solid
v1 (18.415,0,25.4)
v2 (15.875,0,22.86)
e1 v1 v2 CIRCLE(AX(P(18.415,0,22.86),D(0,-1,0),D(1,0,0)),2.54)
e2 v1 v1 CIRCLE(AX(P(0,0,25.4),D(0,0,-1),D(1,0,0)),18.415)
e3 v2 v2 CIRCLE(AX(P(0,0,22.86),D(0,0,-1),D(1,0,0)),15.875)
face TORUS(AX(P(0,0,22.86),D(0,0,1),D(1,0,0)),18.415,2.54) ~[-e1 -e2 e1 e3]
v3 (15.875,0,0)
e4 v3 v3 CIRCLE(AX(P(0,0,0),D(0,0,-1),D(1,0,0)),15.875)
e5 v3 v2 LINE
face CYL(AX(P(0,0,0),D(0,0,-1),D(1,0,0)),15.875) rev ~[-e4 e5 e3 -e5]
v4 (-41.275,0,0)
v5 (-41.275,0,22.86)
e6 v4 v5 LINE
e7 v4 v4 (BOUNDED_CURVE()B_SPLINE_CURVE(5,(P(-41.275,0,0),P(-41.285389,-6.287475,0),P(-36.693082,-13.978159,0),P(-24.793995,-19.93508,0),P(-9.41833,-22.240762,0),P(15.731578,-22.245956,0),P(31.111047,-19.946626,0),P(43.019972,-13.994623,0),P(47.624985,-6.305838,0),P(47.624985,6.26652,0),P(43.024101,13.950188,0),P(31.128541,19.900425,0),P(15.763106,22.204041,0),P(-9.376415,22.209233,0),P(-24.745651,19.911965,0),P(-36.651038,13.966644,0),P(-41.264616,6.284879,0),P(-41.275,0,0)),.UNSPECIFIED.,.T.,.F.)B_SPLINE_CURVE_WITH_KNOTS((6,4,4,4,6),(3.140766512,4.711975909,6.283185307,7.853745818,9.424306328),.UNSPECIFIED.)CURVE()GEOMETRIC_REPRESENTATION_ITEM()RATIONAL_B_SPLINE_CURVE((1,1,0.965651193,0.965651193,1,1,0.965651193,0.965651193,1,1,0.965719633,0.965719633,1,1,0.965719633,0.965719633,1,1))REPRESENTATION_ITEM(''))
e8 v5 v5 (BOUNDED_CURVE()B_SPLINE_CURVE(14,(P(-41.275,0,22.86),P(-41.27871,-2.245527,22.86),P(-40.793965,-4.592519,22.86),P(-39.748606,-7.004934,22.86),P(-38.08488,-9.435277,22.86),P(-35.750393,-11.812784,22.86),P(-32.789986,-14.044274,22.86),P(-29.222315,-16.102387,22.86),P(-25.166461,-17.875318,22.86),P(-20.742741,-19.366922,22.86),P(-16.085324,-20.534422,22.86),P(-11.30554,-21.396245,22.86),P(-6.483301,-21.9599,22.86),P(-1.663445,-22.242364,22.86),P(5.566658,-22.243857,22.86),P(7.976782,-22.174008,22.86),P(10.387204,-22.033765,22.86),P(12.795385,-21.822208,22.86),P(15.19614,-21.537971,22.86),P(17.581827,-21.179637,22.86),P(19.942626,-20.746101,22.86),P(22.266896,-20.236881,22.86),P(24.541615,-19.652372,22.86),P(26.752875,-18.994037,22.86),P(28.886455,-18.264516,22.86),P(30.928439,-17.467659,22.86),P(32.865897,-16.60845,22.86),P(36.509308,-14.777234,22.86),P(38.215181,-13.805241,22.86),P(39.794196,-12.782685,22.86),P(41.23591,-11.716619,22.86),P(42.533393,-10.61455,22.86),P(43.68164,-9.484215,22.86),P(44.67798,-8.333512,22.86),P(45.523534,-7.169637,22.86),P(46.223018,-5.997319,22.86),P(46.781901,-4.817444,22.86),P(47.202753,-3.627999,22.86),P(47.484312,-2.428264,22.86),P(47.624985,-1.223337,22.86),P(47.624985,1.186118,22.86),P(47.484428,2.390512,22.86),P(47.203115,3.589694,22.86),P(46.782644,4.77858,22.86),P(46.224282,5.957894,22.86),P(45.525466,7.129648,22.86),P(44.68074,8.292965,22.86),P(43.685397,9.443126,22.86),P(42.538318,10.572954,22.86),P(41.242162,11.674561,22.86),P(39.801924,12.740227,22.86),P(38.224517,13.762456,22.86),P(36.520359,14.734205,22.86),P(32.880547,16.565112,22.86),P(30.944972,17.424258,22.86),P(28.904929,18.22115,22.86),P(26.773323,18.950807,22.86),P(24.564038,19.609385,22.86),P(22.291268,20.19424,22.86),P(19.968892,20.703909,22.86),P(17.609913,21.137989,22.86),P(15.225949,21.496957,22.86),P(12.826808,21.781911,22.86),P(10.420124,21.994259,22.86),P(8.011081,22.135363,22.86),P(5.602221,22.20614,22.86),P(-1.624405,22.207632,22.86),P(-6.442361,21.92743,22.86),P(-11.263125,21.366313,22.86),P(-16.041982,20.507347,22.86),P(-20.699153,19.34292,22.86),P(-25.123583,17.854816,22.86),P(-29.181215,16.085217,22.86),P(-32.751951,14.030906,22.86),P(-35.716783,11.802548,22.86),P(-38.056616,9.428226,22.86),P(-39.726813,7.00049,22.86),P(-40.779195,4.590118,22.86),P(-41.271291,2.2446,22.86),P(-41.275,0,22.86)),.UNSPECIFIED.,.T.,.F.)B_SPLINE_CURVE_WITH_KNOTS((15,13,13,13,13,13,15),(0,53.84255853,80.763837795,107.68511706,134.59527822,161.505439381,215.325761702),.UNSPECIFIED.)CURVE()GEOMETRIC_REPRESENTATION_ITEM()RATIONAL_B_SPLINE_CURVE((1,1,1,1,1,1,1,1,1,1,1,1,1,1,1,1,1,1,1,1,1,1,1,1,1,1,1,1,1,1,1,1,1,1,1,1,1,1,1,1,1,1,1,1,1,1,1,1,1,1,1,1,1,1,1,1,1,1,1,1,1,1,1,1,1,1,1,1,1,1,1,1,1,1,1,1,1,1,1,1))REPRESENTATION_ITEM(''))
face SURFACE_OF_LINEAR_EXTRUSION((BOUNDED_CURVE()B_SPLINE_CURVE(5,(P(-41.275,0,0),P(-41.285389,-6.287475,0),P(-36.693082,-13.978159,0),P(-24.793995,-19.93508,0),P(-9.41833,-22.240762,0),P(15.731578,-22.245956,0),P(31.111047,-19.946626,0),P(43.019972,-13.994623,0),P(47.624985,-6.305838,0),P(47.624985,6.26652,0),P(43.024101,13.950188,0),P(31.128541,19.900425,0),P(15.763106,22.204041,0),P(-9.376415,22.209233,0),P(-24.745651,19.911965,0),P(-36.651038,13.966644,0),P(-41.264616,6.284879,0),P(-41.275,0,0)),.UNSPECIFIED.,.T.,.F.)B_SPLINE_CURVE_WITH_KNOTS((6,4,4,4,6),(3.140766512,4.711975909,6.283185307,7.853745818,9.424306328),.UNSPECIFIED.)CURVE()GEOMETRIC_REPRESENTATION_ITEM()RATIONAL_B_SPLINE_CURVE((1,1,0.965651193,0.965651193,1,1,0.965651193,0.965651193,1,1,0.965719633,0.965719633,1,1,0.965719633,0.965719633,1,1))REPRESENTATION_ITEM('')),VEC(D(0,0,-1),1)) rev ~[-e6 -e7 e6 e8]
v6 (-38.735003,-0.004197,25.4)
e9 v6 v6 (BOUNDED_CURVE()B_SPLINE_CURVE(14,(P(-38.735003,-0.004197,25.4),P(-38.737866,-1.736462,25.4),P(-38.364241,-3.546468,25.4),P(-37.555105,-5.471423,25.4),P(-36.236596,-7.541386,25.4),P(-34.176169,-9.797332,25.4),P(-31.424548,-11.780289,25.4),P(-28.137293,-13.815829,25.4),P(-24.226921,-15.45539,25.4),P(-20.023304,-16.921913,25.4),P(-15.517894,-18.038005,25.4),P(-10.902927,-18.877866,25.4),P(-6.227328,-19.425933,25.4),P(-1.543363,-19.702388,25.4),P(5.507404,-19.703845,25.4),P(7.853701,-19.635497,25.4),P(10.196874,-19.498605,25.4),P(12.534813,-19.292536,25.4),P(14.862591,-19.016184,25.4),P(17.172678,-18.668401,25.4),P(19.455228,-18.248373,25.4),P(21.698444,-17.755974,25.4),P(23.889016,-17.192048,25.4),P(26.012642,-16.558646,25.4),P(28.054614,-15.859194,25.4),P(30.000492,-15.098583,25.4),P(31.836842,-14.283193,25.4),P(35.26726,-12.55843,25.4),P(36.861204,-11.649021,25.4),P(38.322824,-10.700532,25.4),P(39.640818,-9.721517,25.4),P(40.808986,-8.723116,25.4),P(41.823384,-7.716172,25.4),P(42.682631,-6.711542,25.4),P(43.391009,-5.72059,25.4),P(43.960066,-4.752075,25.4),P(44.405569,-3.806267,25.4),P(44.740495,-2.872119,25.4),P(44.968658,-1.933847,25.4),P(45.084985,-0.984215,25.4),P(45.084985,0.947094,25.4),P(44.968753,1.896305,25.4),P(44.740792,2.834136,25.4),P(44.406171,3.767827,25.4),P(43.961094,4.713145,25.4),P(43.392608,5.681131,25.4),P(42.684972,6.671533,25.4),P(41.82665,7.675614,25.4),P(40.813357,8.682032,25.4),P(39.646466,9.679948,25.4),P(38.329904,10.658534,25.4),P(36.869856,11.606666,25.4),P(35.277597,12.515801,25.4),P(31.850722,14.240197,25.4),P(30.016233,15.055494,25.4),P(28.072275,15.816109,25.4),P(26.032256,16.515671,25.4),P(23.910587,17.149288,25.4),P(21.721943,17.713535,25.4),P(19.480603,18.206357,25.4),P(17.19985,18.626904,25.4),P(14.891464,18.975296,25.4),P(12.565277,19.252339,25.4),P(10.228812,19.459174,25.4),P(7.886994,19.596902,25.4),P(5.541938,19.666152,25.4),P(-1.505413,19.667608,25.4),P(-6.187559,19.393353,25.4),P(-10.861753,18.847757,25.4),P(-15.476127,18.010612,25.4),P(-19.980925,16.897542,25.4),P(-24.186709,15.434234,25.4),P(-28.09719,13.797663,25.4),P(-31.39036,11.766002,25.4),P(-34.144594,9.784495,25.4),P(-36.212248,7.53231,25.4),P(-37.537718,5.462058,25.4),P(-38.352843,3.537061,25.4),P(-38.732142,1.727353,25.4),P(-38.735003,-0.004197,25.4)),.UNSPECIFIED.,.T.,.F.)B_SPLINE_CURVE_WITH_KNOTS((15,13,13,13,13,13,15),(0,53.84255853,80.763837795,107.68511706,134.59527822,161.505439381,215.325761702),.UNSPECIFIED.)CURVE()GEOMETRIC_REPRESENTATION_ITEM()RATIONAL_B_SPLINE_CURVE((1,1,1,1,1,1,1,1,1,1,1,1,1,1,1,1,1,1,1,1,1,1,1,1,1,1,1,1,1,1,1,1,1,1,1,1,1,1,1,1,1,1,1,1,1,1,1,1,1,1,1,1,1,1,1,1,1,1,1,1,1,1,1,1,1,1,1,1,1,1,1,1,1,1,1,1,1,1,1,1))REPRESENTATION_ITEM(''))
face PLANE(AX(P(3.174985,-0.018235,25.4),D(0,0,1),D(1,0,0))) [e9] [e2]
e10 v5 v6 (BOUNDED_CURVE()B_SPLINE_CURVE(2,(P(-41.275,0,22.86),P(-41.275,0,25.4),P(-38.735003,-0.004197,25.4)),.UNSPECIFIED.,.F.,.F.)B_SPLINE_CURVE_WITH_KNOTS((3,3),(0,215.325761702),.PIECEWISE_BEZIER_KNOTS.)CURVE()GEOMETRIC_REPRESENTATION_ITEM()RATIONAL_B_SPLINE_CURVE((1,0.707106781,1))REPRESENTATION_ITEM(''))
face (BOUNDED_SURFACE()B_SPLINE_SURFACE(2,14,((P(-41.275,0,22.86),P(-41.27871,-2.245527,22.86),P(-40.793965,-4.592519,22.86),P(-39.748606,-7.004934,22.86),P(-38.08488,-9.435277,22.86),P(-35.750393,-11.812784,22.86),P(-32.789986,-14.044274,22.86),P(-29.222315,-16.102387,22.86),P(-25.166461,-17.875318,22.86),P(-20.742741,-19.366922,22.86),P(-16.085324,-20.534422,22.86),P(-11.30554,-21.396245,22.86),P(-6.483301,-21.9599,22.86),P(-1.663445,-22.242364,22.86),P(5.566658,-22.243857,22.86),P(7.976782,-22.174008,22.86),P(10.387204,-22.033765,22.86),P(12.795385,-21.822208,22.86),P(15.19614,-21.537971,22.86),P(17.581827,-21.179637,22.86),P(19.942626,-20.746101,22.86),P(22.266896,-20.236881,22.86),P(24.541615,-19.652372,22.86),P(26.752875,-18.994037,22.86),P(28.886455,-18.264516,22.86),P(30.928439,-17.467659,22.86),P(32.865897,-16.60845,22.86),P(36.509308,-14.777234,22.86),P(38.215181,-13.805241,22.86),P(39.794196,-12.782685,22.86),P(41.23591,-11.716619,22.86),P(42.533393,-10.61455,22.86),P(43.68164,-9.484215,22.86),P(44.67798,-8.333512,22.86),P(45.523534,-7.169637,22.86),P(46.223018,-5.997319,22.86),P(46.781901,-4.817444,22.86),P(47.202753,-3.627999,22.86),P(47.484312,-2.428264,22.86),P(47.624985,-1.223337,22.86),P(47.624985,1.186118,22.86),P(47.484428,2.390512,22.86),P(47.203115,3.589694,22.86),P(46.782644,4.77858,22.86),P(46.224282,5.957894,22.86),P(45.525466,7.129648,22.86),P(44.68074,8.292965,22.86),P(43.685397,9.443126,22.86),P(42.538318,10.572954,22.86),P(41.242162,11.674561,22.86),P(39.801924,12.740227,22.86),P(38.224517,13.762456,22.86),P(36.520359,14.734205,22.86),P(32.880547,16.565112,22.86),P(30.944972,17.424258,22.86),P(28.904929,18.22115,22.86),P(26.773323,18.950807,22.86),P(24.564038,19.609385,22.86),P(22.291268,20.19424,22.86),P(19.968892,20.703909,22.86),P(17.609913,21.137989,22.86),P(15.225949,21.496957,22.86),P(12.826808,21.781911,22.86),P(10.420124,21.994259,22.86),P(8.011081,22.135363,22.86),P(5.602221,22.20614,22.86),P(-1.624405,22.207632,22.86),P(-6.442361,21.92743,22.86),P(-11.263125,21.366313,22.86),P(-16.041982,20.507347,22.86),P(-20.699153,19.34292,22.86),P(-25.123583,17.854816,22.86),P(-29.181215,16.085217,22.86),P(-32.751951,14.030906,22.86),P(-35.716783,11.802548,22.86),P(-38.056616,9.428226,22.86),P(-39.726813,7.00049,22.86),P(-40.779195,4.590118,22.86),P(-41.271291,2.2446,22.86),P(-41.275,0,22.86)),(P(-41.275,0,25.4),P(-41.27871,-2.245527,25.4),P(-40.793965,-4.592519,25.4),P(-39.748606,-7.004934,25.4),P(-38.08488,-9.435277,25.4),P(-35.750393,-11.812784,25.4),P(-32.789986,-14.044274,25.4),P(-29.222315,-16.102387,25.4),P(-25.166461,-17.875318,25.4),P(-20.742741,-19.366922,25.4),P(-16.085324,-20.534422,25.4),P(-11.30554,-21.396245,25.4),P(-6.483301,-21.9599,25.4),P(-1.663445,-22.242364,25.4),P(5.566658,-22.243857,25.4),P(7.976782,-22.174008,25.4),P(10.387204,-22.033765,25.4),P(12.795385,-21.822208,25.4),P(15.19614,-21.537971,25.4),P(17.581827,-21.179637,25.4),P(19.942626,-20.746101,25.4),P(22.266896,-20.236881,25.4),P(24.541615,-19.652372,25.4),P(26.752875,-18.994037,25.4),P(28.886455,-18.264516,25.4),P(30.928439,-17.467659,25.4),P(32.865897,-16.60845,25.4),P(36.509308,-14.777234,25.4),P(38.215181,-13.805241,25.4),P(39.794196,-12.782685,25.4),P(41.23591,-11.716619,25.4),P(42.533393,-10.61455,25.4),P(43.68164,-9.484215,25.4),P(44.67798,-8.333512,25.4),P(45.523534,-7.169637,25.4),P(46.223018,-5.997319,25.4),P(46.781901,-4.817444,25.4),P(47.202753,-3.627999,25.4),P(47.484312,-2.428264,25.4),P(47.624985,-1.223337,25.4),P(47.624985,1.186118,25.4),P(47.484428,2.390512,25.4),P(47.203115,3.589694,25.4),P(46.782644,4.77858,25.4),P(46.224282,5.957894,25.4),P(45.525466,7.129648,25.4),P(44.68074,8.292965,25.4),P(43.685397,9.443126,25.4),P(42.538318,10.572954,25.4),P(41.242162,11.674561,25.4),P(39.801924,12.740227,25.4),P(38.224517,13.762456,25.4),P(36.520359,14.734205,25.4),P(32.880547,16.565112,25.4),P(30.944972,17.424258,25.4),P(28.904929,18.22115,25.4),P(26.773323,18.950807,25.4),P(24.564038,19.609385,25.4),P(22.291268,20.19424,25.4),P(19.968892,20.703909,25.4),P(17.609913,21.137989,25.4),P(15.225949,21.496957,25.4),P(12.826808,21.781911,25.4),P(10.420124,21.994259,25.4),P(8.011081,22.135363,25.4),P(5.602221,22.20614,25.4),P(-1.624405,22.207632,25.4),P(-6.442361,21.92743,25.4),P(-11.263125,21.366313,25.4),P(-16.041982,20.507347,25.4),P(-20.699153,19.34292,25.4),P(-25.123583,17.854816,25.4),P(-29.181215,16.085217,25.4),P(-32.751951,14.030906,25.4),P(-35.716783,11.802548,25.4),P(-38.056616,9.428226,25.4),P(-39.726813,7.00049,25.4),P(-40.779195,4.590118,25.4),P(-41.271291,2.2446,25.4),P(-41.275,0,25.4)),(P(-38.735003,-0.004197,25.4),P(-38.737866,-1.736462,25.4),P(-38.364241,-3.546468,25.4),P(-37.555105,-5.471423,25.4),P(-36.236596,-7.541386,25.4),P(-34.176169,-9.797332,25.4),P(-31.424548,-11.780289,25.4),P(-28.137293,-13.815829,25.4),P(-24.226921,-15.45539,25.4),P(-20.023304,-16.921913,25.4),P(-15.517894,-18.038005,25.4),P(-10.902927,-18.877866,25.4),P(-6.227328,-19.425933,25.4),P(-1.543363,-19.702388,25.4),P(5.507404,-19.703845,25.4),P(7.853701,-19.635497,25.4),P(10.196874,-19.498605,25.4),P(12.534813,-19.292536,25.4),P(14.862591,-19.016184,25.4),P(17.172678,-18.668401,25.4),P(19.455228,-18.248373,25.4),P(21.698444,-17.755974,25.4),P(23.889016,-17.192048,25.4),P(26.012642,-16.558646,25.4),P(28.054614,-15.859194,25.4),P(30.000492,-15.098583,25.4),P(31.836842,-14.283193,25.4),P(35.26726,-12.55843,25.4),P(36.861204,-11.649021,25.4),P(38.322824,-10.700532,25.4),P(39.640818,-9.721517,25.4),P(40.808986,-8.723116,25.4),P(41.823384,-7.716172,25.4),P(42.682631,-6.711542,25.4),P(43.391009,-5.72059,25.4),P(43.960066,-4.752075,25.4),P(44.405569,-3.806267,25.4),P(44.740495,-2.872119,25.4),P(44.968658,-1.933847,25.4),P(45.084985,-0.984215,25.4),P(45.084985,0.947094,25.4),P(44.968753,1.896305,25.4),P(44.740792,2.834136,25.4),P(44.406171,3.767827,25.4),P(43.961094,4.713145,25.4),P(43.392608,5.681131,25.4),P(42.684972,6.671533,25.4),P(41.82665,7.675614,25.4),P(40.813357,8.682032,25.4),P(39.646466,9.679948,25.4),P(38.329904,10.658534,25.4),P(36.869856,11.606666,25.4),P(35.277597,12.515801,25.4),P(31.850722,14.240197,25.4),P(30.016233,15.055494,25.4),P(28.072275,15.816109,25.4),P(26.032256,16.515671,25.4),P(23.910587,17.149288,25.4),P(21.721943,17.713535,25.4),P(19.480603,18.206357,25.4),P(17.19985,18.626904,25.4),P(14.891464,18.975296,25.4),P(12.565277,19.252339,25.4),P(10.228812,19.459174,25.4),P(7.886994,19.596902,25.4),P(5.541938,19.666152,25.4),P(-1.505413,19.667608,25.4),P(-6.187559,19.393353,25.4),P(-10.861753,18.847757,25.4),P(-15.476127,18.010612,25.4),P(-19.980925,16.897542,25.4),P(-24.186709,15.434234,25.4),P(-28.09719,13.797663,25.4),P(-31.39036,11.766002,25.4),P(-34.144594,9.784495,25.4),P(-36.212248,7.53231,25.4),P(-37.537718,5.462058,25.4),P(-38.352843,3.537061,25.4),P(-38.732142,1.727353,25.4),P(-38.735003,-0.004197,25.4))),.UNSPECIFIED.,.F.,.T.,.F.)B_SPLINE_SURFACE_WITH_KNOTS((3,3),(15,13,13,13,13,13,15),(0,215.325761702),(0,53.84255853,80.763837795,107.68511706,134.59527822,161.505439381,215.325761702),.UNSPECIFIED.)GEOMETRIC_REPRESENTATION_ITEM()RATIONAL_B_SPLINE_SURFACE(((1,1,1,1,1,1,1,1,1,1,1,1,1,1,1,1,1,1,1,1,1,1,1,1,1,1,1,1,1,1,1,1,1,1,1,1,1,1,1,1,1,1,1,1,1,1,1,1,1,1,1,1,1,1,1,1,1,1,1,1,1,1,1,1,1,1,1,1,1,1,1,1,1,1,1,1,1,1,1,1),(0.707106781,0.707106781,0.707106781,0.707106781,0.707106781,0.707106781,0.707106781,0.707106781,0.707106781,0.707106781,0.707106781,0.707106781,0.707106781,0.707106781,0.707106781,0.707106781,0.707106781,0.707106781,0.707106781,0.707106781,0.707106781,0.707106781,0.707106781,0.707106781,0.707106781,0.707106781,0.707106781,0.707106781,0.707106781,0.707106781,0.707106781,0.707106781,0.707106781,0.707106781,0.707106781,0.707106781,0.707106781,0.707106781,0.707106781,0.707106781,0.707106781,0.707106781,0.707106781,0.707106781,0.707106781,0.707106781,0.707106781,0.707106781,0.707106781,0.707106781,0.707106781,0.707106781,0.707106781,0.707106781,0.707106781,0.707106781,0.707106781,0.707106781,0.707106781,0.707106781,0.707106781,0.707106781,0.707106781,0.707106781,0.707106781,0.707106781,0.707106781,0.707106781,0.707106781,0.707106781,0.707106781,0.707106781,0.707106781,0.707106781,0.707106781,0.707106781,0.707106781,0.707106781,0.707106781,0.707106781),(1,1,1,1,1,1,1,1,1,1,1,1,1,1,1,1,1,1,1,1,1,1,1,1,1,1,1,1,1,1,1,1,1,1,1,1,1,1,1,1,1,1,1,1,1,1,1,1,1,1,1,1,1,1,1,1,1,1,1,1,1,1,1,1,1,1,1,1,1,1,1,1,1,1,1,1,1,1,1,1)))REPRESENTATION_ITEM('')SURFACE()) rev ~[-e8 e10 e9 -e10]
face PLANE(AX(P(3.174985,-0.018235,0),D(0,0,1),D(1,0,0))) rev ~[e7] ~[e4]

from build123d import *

# Parameters (mm, degrees)
F1_DEPTH = 25.4
F2_R     = 2.54
F3_R     = 2.54


# Not quite as in the source:
# - a feature names something its author has since deleted; it is built from what else it names


with BuildPart() as f1:
    # F0 (on Top) → F1 (new body)
    with BuildSketch(Plane.XY):
        with BuildLine():
            add(Edge.make_bspline(
                [(47.6249848312, -0.0183610014), (47.6249848312, 22.1974603925), (3.1933458341, 22.2066371025), (-41.2382931629, 22.2158138126), (-41.275, 0)],
                knots=[0, 0, 0, 1.5703832559, 1.5703832559, 3.1407665117, 3.1407665117, 3.1407665117], degree=2, weights=[1, 0.7072528087, 1, 0.7072528087, 1]))
            add(Edge.make_bspline(
                [(-41.275, 0), (-41.3117371747, -22.2341748108), (3.1566238283, -22.2433591053), (47.6249848312, -22.2525433997), (47.6249848312, -0.0183610014)],
                knots=[3.1407665117, 3.1407665117, 3.1407665117, 4.7119759094, 4.7119759094, 6.2831853072, 6.2831853072, 6.2831853072], degree=2, weights=[1, 0.7069607235, 1, 0.7069607235, 1]))
        make_face()
        with BuildLine():
            ThreePointArc((-15.875, 0), (0, 15.875), (15.875, 0))
            ThreePointArc((15.875, 0), (0, -15.875), (-15.875, 0))
        make_face(mode=Mode.SUBTRACT)
    extrude(amount=F1_DEPTH)

    # F2
    f2_edges = [f1.edges().sort_by_distance(p)[0] for p in [
        (3.165804, -22.243361, 25.4),
    ]]
    fillet(f2_edges, radius=F2_R)

    # F3
    f3_edges = [f1.edges().sort_by_distance(p)[0] for p in [
        (-15.875, 0, 25.4),
    ]]
    fillet(f3_edges, radius=F3_R)


solid = f1.part
